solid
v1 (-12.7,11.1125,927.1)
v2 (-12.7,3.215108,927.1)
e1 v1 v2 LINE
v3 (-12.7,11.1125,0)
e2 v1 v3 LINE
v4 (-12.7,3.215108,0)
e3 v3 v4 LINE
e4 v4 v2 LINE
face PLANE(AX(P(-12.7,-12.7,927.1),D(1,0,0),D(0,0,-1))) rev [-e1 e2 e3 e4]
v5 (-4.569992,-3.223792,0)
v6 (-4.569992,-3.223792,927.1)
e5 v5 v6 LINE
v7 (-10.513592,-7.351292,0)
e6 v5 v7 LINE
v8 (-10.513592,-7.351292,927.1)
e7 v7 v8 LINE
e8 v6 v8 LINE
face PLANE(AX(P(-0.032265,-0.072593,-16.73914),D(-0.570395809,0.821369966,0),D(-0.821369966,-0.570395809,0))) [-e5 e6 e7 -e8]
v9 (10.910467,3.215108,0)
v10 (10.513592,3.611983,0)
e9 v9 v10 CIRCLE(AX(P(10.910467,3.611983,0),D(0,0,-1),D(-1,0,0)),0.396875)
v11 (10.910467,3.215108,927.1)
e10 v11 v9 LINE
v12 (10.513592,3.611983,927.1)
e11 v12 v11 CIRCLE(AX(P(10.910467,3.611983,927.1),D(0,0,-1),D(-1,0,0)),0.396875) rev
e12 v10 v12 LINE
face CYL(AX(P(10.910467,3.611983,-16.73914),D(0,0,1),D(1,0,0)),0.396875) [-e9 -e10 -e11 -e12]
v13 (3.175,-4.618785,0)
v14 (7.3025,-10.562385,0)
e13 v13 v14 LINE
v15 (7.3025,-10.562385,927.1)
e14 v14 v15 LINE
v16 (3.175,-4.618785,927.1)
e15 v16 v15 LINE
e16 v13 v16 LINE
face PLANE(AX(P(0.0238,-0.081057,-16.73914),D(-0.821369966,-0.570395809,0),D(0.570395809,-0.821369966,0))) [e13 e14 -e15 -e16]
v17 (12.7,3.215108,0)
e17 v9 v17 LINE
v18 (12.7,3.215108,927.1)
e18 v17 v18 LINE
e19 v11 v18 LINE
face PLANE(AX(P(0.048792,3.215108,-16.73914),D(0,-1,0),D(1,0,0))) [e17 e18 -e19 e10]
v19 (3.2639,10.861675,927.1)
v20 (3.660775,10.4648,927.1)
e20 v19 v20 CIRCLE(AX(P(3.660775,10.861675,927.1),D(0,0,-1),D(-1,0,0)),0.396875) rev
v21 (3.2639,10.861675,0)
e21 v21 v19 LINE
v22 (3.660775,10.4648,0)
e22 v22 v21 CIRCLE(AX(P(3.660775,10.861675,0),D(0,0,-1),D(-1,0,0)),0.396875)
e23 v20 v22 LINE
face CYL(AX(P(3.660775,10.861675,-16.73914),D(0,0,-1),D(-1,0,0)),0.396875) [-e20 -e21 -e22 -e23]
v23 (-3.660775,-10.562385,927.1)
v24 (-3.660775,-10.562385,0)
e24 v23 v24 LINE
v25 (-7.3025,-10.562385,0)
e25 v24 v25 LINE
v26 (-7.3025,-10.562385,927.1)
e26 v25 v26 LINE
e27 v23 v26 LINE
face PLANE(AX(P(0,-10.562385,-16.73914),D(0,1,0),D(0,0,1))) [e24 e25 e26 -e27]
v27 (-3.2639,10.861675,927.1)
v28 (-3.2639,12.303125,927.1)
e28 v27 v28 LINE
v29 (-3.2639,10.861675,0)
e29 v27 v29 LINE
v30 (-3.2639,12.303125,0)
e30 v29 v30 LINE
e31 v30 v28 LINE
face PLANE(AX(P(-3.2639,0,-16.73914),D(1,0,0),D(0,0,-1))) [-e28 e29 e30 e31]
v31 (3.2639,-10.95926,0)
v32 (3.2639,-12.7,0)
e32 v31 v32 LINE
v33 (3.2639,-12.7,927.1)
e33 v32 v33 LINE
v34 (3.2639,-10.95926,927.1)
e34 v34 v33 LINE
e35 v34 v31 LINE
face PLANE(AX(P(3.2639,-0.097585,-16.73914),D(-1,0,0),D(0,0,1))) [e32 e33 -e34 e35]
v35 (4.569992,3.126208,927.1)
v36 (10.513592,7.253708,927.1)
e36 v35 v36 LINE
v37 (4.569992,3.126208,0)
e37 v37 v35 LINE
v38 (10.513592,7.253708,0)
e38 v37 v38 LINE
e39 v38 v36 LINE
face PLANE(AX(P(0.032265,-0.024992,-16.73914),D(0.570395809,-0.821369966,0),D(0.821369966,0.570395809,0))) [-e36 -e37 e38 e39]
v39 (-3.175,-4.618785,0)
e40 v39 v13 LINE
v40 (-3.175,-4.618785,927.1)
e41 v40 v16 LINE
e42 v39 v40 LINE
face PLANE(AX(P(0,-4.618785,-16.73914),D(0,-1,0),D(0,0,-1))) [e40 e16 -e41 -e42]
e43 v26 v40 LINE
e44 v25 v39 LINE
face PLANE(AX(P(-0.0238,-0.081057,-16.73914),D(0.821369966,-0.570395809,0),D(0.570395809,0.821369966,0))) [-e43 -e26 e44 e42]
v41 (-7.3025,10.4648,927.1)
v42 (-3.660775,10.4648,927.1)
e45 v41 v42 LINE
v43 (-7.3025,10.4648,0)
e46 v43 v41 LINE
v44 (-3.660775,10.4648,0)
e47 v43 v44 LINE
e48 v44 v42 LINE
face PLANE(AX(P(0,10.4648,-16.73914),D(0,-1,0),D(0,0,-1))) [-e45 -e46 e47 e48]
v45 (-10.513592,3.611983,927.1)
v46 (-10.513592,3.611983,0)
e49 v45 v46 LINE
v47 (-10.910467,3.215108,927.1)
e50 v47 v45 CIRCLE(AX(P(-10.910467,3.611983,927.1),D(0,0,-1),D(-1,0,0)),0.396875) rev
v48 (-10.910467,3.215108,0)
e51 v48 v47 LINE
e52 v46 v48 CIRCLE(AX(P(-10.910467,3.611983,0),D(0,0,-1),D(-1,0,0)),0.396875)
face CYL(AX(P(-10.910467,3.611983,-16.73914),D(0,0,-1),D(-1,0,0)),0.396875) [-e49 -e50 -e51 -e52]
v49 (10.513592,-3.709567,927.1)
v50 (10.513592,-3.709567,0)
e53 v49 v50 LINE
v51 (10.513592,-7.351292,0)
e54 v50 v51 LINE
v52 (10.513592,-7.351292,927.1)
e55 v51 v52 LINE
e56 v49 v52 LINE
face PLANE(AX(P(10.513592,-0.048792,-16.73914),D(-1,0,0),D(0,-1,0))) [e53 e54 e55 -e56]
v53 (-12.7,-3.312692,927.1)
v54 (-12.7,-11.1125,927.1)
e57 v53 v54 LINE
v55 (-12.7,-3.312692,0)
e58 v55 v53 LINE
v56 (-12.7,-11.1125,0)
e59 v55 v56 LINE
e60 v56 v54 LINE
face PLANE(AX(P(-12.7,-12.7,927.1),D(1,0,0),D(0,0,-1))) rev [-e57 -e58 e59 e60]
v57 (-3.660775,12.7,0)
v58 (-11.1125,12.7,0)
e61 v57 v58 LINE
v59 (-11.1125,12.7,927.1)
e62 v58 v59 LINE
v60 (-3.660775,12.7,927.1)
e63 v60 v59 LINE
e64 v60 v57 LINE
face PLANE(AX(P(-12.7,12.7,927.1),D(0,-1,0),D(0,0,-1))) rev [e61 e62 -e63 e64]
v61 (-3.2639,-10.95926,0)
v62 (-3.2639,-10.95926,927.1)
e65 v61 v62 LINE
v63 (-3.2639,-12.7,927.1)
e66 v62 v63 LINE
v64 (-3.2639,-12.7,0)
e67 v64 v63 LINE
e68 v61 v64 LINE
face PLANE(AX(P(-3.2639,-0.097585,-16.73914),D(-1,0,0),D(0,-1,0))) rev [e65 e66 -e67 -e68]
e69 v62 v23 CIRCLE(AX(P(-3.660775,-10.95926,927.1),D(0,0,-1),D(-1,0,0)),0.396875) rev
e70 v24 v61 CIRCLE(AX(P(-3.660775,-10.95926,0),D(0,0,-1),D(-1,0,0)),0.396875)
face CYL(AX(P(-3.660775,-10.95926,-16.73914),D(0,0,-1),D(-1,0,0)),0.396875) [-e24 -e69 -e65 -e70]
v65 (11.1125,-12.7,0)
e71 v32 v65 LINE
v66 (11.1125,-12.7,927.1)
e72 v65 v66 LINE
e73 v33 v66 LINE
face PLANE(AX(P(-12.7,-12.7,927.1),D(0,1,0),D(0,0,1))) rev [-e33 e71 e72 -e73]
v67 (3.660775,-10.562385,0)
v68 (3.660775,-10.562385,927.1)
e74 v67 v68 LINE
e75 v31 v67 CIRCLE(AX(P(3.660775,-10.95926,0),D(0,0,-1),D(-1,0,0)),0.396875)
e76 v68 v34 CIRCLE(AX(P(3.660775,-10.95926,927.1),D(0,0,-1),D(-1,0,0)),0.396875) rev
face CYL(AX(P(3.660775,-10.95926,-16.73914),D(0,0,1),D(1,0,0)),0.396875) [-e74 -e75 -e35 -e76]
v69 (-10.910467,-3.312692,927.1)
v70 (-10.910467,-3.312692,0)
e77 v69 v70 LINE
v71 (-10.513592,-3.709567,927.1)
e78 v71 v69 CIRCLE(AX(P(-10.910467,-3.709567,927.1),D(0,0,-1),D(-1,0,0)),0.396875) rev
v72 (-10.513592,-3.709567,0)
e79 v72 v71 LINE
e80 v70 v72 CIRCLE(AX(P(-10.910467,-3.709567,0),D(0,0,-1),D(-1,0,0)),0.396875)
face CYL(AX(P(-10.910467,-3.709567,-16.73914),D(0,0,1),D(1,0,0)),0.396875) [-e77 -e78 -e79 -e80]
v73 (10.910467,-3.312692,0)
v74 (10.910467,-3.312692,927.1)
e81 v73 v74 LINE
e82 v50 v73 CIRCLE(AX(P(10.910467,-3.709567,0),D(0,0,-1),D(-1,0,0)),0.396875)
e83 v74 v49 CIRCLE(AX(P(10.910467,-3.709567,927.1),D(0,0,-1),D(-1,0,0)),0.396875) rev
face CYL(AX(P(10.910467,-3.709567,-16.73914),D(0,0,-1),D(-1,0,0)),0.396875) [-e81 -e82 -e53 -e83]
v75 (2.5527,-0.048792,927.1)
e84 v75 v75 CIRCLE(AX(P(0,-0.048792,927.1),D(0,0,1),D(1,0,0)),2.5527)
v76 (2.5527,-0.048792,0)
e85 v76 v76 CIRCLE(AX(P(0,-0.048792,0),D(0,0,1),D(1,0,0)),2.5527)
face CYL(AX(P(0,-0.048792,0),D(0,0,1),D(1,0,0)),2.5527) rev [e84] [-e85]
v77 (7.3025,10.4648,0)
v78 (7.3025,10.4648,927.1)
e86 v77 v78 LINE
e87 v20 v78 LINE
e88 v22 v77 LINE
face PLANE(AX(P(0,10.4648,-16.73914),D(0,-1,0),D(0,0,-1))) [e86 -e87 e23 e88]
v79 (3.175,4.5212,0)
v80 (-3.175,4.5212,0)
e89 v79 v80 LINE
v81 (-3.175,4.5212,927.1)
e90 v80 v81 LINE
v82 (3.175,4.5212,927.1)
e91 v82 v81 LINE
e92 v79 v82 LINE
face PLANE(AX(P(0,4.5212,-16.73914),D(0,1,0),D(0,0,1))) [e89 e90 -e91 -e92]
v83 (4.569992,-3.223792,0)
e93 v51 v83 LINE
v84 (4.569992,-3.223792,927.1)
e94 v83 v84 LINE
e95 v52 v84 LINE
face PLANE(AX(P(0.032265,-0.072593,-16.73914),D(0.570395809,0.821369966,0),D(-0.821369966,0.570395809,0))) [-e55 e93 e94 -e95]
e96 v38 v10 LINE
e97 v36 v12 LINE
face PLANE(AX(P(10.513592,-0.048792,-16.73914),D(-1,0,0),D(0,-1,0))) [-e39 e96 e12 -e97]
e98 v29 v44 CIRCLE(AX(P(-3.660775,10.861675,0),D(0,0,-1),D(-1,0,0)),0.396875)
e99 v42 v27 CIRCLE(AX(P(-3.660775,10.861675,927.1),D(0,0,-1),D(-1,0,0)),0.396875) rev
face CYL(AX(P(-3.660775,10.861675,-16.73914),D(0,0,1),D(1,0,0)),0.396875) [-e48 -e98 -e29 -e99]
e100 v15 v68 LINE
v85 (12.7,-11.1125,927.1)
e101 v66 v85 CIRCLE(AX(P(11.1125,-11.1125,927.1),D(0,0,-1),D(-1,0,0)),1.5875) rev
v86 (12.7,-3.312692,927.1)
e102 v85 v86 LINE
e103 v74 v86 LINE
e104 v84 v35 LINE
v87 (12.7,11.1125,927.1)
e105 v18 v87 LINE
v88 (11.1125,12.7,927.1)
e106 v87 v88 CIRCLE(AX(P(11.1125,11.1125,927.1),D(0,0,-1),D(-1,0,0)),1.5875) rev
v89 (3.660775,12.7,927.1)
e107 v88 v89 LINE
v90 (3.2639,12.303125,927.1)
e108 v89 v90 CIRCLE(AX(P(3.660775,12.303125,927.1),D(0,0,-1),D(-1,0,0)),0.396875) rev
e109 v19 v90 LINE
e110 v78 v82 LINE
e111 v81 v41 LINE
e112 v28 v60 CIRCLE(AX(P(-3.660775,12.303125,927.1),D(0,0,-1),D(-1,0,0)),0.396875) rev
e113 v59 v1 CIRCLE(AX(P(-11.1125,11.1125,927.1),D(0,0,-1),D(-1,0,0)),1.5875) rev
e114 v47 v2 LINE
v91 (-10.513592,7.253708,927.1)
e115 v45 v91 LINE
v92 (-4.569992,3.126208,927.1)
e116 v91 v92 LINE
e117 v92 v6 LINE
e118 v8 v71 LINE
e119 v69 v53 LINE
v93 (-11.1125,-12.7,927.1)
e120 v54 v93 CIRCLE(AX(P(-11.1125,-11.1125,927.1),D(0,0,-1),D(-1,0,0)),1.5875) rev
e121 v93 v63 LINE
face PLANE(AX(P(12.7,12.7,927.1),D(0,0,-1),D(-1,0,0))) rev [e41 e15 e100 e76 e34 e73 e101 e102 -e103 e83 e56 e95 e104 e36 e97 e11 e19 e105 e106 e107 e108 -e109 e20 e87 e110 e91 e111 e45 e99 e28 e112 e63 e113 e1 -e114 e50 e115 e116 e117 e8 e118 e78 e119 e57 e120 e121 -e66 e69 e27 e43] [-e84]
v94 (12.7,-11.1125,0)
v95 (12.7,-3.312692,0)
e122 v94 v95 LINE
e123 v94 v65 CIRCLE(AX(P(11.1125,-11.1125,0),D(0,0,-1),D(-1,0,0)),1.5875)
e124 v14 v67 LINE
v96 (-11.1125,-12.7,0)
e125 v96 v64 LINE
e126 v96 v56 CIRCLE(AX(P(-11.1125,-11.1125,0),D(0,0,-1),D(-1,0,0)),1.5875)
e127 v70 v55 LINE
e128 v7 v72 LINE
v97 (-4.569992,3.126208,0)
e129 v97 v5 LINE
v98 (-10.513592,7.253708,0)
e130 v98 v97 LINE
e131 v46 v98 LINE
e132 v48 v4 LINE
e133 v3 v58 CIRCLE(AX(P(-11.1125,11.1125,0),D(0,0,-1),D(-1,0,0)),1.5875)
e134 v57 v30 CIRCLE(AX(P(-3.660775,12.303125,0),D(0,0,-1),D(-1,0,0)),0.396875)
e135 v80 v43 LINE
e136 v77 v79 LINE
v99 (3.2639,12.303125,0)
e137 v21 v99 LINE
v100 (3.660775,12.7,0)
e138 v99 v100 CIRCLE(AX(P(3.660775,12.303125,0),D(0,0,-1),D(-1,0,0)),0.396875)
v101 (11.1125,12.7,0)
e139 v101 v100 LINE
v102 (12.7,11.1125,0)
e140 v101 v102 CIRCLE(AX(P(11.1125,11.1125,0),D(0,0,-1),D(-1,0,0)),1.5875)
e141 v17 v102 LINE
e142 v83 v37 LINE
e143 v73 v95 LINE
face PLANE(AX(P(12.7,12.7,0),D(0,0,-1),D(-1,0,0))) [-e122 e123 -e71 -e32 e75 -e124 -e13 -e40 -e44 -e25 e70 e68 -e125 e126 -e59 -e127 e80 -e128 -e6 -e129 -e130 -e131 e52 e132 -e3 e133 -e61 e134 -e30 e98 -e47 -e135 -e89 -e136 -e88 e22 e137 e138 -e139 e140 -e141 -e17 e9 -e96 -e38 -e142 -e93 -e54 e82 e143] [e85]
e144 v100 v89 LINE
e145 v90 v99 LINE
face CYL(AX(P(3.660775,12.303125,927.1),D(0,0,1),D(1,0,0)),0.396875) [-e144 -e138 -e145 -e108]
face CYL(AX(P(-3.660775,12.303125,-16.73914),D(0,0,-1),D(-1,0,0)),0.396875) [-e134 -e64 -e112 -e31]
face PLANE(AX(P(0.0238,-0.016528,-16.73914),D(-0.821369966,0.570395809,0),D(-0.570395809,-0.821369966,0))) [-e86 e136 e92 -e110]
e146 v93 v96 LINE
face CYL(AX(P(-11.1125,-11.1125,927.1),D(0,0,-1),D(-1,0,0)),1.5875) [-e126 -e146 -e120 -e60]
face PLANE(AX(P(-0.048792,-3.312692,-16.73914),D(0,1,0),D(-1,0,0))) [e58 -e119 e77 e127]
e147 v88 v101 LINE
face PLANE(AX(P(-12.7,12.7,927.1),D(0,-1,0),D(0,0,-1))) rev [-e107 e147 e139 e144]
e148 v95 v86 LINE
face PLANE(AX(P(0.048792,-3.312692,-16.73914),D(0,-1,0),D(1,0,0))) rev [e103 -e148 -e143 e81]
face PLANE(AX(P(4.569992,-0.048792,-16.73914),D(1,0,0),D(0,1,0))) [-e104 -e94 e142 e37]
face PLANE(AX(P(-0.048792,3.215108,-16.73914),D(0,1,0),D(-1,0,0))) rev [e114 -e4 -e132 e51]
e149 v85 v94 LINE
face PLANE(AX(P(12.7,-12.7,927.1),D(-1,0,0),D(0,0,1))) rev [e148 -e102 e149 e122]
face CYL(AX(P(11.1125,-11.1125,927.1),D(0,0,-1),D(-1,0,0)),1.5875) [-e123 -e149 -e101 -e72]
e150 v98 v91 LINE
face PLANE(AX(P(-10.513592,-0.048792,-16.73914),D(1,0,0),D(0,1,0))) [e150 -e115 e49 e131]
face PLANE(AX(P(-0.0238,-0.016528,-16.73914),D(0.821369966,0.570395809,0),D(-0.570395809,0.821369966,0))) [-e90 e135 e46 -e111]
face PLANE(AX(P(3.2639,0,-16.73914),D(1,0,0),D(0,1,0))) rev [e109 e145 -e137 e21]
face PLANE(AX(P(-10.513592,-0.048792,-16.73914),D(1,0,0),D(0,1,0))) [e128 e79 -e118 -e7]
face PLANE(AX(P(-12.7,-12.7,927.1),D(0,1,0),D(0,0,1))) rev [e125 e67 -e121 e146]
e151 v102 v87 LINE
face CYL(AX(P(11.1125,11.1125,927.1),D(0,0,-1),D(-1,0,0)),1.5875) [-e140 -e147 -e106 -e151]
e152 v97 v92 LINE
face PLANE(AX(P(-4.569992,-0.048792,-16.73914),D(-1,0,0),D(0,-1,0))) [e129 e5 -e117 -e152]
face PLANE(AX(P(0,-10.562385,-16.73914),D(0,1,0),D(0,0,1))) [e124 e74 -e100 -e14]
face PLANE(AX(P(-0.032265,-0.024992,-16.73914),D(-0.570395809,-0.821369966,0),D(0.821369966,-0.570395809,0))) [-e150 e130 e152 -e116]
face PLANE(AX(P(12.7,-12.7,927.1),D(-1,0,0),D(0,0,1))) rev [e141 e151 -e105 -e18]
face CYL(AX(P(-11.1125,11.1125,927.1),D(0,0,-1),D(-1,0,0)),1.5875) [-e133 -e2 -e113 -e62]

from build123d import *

# Parameters (mm, degrees)
SKETCH1_W           = 25.4
SKETCH1_H           = 25.4
BOSS_EXTRUDE1_DEPTH = 927.1
FILLET1_R           = 1.5875
HOLE1_OUTLINE_R     = 2.5527
HOLE1_DEPTH         = 927.1
SKETCH7_W           = 6.5278
SKETCH7_H           = 2.2352
CUT_EXTRUDE2_DEPTH  = 927.1
FILLET4_R           = 0.396875
CIRPATTERN2_DEPTH   = 927.1


# Read off the part's stored shape, not the designer's step: Hole1, CirPattern2
with BuildPart() as part:
    # Sketch1 → Boss-Extrude1 (new body)
    with BuildSketch(Plane.XY):
        Rectangle(SKETCH1_W, SKETCH1_H)
    extrude(amount=BOSS_EXTRUDE1_DEPTH)

    # Fillet1
    fillet1_edges = [part.edges().sort_by_distance(p)[0] for p in [
        (12.7, -12.7, 463.55),
        (-12.7, -12.7, 463.55),
        (-12.7, 12.7, 463.55),
        (12.7, 12.7, 463.55),
    ]]
    fillet(fillet1_edges, radius=FILLET1_R)

    # Hole1 outline → Hole1 (cut)
    with BuildSketch(Plane.XY):
        with Locations((0, -0.048792482)):
            Circle(HOLE1_OUTLINE_R)
    extrude(amount=HOLE1_DEPTH, mode=Mode.SUBTRACT)

    # Sketch7 → Cut-Extrude2 (cut)
    with BuildSketch(Plane.XY.offset(927.1)):
        with Locations((0, 11.5824)):
            Rectangle(SKETCH7_W, SKETCH7_H)
        Polygon((-3.175, 4.5212), (-7.3025, 10.4648), (7.3025, 10.4648), (3.175, 4.5212), align=None)
    extrude(amount=-CUT_EXTRUDE2_DEPTH, mode=Mode.SUBTRACT)

    # Fillet4
    fillet4_edges = [part.edges().sort_by_distance(p)[0] for p in [
        (-3.2639, 10.4648, 463.55),
        (-3.2639, 12.7, 463.55),
        (3.2639, 12.7, 463.55),
        (3.2639, 10.4648, 463.55),
    ]]
    fillet(fillet4_edges, radius=FILLET4_R)

    # CirPattern2 outline → CirPattern2 (cut)
    with BuildSketch(Plane.XY):
        with BuildLine():
            ThreePointArc((-3.660775, -10.562384964), (-3.380141996, -10.67862696), (-3.2639, -10.959259964))
            Line((-3.2639, -10.959259964), (-3.2639, -12.7))
            Line((-3.2639, -12.7), (3.2639, -12.7))
            Line((3.2639, -12.7), (3.2639, -10.959259964))
            ThreePointArc((3.2639, -10.959259964), (3.380141996, -10.67862696), (3.660775, -10.562384964))
            Line((3.660775, -10.562384964), (7.3025, -10.562384964))
            Line((7.3025, -10.562384964), (3.175, -4.618784964))
            Line((3.175, -4.618784964), (-3.175, -4.618784964))
            Line((-3.175, -4.618784964), (-7.3025, -10.562384964))
            Line((-7.3025, -10.562384964), (-3.660775, -10.562384964))
        make_face()
        with BuildLine():
            Line((-12.7, -3.312692482), (-10.910467482, -3.312692482))
            ThreePointArc((-10.910467482, -3.312692482), (-10.629834478, -3.428934478), (-10.513592482, -3.709567482))
            Line((-10.513592482, -3.709567482), (-10.513592482, -7.351292482))
            Line((-10.513592482, -7.351292482), (-4.569992482, -3.223792482))
            Line((-4.569992482, -3.223792482), (-4.569992482, 3.126207518))
            Line((-4.569992482, 3.126207518), (-10.513592482, 7.253707518))
            Line((-10.513592482, 7.253707518), (-10.513592482, 3.611982518))
            ThreePointArc((-10.513592482, 3.611982518), (-10.629834478, 3.331349514), (-10.910467482, 3.215107518))
            Line((-10.910467482, 3.215107518), (-12.7, 3.215107518))
            Line((-12.7, 3.215107518), (-12.7, -3.312692482))
        make_face()
        with BuildLine():
            ThreePointArc((10.513592482, -3.709567482), (10.629834478, -3.428934478), (10.910467482, -3.312692482))
            Line((10.910467482, -3.312692482), (12.7, -3.312692482))
            Line((12.7, -3.312692482), (12.7, 3.215107518))
            Line((12.7, 3.215107518), (10.910467482, 3.215107518))
            ThreePointArc((10.910467482, 3.215107518), (10.629834478, 3.331349514), (10.513592482, 3.611982518))
            Line((10.513592482, 3.611982518), (10.513592482, 7.253707518))
            Line((10.513592482, 7.253707518), (4.569992482, 3.126207518))
            Line((4.569992482, 3.126207518), (4.569992482, -3.223792482))
            Line((4.569992482, -3.223792482), (10.513592482, -7.351292482))
            Line((10.513592482, -7.351292482), (10.513592482, -3.709567482))
        make_face()
    extrude(amount=CIRPATTERN2_DEPTH, mode=Mode.SUBTRACT)


solid = part.part
